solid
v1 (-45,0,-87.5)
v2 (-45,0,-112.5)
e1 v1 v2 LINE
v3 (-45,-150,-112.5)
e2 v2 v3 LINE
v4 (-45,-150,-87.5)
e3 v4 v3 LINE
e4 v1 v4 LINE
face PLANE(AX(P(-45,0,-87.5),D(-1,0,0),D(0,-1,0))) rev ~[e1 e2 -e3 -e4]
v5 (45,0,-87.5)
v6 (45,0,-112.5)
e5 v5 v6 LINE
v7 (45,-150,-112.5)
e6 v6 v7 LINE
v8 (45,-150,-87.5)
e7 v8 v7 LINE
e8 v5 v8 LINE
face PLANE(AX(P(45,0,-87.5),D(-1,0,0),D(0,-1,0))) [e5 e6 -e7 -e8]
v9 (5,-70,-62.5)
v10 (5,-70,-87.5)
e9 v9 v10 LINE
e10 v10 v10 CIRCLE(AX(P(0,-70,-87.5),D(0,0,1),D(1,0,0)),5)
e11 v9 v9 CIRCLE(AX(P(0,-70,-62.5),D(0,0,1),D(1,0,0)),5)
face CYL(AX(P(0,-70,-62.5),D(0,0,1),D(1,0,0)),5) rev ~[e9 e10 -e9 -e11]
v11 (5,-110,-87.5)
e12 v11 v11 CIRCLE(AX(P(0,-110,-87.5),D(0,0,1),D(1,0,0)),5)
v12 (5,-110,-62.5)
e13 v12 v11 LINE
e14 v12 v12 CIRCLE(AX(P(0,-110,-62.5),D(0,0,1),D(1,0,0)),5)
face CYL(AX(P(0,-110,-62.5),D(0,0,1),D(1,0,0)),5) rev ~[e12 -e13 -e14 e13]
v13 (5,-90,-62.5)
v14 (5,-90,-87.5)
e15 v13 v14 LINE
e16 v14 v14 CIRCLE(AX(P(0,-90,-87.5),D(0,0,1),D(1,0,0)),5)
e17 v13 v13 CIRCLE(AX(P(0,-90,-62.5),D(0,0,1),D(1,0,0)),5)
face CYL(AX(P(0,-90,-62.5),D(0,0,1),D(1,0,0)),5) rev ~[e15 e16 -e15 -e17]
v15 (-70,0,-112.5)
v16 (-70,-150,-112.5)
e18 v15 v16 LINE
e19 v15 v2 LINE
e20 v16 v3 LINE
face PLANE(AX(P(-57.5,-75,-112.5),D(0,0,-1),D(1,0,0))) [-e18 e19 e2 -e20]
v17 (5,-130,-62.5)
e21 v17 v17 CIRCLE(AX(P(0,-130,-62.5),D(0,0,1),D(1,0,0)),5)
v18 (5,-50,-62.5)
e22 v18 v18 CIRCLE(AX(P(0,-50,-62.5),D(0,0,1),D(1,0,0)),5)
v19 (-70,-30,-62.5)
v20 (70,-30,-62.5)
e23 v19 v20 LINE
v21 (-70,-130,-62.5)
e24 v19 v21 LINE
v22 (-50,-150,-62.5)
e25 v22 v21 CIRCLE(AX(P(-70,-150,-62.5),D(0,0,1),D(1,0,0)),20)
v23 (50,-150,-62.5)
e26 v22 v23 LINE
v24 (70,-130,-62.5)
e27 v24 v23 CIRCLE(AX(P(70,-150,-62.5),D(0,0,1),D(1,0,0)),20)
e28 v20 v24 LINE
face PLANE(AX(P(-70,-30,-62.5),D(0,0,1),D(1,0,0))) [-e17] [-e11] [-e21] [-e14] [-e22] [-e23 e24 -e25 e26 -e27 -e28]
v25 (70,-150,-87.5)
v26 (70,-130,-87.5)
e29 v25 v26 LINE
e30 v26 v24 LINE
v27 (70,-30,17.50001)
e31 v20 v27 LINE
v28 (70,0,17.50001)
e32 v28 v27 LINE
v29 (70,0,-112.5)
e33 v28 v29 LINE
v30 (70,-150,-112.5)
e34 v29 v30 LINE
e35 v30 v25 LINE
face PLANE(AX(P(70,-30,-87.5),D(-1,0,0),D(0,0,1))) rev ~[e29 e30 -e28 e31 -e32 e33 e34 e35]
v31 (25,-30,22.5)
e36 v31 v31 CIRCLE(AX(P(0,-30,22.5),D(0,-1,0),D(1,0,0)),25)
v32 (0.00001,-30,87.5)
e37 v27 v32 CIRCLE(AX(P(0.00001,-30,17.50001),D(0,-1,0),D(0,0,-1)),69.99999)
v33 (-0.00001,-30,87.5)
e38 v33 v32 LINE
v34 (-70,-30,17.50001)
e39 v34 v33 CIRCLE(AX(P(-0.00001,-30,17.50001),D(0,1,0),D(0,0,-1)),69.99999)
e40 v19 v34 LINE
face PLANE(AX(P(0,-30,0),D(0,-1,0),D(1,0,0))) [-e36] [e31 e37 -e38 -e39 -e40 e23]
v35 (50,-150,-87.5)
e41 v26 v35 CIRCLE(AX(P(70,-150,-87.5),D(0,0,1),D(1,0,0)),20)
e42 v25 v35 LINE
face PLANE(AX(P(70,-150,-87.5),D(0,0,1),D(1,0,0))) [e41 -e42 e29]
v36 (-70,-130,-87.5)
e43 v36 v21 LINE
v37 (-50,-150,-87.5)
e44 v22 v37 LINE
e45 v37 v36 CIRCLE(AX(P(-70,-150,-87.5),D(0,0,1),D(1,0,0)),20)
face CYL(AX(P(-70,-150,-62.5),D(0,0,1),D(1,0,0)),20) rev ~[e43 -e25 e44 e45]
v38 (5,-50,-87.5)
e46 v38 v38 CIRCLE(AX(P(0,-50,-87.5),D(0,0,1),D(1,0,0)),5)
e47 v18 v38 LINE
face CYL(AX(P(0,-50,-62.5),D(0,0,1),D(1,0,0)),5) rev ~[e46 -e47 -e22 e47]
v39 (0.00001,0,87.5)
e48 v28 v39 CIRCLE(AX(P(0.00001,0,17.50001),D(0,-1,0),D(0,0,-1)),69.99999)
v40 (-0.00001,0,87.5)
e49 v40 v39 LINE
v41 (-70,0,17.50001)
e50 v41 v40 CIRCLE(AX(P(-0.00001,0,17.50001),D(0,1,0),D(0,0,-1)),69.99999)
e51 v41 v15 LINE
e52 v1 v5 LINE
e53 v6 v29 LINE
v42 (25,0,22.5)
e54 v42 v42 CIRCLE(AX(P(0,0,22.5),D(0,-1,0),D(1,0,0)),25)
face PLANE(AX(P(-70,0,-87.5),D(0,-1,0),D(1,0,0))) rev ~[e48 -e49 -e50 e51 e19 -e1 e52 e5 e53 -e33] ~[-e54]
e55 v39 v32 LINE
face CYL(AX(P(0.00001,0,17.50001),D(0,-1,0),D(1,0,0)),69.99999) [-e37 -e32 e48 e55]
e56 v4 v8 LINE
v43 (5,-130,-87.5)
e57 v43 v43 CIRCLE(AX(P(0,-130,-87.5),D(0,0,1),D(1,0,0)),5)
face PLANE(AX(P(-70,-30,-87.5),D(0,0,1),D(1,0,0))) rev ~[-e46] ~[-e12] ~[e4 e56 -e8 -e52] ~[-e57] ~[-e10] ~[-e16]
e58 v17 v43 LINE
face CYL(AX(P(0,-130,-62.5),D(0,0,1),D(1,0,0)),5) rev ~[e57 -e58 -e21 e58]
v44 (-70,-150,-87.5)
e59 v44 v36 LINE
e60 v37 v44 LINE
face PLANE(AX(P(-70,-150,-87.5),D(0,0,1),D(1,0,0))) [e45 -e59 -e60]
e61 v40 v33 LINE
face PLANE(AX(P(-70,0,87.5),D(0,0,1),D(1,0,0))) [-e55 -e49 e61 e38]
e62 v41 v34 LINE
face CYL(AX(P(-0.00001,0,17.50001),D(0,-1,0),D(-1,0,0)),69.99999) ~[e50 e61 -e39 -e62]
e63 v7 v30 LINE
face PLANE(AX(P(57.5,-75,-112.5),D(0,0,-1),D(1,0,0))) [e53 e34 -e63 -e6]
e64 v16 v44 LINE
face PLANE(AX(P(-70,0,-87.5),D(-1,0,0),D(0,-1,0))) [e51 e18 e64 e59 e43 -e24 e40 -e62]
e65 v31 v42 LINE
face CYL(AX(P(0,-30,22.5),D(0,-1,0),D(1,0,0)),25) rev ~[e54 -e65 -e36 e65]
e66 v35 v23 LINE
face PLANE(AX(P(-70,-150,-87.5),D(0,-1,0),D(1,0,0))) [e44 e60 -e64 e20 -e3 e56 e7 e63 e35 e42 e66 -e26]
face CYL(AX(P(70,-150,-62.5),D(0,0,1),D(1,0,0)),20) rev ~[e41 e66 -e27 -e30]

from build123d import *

# Parameters (mm, degrees)
F0_W      = 140
F0_H      = 175
F1_DEPTH  = 30
F2_R      = 69.99999
F3_R      = 25
F4_DEPTH  = 30.001
F5_W      = 140
F5_H      = 25
F6_DEPTH  = 120
F7_W      = 25
F7_H      = 150
F8_DEPTH  = 25
F9_R      = 20
F10_DEPTH = 25
F11_R     = 5
F12_DEPTH = 50.001


# Not quite as in the source:
# - a fillet or chamfer is up to 0.001 mm smaller than in the source, because OpenCascade refuses the exact size


with BuildPart() as f1:
    # F0 (on Front) → F1 (new body)
    with BuildSketch(Plane.XZ):
        Rectangle(F0_W, F0_H)
    extrude(amount=F1_DEPTH)

    # F2 (radius 70 in the source; OpenCascade refuses exactly that, so slightly less here)
    f2_edges = [f1.edges().sort_by_distance(p)[0] for p in [
        (70, -15, 87.5),
        (-70, -15, 87.5),
    ]]
    fillet(f2_edges, radius=F2_R)

    # F3 (on face) → F4 (cut, through all)
    with BuildSketch(Plane.XZ.offset(30)):
        with Locations((0, 22.5)):
            Circle(F3_R)
    extrude(amount=-F4_DEPTH, mode=Mode.SUBTRACT)

    # F5 (on face) → F6 (join)
    with BuildSketch(Plane.XZ.offset(30)):
        with Locations((0, -75)):
            Rectangle(F5_W, F5_H)
    extrude(amount=F6_DEPTH)

    # F7 (on face) → F8 (join)
    with BuildSketch(Plane(origin=(0, 0, -87.5), x_dir=(1, 0, 0), z_dir=(0, 0, -1))):
        with Locations((-57.5, 75)):
            Rectangle(F7_W, F7_H)
        with Locations((57.5, 75)):
            Rectangle(F7_W, F7_H)
    extrude(amount=F8_DEPTH)

    # F9 (on face) → F10 (cut)
    with BuildSketch(Plane.XY.offset(-62.5)):
        with Locations((-70, -150)):
            Circle(F9_R)
        with Locations((70, -150)):
            Circle(F9_R)
    extrude(amount=-F10_DEPTH, mode=Mode.SUBTRACT)

    # F11 (on face) → F12 (cut, through all)
    with BuildSketch(Plane.XY.offset(-62.5)):
        with Locations((0, -130)):
            Circle(F11_R)
        with Locations((0, -110)):
            Circle(F11_R)
        with Locations((0, -90)):
            Circle(F11_R)
        with Locations((0, -70)):
            Circle(F11_R)
        with Locations((0, -50)):
            Circle(F11_R)
    extrude(amount=-F12_DEPTH, mode=Mode.SUBTRACT)


solid = f1.part
